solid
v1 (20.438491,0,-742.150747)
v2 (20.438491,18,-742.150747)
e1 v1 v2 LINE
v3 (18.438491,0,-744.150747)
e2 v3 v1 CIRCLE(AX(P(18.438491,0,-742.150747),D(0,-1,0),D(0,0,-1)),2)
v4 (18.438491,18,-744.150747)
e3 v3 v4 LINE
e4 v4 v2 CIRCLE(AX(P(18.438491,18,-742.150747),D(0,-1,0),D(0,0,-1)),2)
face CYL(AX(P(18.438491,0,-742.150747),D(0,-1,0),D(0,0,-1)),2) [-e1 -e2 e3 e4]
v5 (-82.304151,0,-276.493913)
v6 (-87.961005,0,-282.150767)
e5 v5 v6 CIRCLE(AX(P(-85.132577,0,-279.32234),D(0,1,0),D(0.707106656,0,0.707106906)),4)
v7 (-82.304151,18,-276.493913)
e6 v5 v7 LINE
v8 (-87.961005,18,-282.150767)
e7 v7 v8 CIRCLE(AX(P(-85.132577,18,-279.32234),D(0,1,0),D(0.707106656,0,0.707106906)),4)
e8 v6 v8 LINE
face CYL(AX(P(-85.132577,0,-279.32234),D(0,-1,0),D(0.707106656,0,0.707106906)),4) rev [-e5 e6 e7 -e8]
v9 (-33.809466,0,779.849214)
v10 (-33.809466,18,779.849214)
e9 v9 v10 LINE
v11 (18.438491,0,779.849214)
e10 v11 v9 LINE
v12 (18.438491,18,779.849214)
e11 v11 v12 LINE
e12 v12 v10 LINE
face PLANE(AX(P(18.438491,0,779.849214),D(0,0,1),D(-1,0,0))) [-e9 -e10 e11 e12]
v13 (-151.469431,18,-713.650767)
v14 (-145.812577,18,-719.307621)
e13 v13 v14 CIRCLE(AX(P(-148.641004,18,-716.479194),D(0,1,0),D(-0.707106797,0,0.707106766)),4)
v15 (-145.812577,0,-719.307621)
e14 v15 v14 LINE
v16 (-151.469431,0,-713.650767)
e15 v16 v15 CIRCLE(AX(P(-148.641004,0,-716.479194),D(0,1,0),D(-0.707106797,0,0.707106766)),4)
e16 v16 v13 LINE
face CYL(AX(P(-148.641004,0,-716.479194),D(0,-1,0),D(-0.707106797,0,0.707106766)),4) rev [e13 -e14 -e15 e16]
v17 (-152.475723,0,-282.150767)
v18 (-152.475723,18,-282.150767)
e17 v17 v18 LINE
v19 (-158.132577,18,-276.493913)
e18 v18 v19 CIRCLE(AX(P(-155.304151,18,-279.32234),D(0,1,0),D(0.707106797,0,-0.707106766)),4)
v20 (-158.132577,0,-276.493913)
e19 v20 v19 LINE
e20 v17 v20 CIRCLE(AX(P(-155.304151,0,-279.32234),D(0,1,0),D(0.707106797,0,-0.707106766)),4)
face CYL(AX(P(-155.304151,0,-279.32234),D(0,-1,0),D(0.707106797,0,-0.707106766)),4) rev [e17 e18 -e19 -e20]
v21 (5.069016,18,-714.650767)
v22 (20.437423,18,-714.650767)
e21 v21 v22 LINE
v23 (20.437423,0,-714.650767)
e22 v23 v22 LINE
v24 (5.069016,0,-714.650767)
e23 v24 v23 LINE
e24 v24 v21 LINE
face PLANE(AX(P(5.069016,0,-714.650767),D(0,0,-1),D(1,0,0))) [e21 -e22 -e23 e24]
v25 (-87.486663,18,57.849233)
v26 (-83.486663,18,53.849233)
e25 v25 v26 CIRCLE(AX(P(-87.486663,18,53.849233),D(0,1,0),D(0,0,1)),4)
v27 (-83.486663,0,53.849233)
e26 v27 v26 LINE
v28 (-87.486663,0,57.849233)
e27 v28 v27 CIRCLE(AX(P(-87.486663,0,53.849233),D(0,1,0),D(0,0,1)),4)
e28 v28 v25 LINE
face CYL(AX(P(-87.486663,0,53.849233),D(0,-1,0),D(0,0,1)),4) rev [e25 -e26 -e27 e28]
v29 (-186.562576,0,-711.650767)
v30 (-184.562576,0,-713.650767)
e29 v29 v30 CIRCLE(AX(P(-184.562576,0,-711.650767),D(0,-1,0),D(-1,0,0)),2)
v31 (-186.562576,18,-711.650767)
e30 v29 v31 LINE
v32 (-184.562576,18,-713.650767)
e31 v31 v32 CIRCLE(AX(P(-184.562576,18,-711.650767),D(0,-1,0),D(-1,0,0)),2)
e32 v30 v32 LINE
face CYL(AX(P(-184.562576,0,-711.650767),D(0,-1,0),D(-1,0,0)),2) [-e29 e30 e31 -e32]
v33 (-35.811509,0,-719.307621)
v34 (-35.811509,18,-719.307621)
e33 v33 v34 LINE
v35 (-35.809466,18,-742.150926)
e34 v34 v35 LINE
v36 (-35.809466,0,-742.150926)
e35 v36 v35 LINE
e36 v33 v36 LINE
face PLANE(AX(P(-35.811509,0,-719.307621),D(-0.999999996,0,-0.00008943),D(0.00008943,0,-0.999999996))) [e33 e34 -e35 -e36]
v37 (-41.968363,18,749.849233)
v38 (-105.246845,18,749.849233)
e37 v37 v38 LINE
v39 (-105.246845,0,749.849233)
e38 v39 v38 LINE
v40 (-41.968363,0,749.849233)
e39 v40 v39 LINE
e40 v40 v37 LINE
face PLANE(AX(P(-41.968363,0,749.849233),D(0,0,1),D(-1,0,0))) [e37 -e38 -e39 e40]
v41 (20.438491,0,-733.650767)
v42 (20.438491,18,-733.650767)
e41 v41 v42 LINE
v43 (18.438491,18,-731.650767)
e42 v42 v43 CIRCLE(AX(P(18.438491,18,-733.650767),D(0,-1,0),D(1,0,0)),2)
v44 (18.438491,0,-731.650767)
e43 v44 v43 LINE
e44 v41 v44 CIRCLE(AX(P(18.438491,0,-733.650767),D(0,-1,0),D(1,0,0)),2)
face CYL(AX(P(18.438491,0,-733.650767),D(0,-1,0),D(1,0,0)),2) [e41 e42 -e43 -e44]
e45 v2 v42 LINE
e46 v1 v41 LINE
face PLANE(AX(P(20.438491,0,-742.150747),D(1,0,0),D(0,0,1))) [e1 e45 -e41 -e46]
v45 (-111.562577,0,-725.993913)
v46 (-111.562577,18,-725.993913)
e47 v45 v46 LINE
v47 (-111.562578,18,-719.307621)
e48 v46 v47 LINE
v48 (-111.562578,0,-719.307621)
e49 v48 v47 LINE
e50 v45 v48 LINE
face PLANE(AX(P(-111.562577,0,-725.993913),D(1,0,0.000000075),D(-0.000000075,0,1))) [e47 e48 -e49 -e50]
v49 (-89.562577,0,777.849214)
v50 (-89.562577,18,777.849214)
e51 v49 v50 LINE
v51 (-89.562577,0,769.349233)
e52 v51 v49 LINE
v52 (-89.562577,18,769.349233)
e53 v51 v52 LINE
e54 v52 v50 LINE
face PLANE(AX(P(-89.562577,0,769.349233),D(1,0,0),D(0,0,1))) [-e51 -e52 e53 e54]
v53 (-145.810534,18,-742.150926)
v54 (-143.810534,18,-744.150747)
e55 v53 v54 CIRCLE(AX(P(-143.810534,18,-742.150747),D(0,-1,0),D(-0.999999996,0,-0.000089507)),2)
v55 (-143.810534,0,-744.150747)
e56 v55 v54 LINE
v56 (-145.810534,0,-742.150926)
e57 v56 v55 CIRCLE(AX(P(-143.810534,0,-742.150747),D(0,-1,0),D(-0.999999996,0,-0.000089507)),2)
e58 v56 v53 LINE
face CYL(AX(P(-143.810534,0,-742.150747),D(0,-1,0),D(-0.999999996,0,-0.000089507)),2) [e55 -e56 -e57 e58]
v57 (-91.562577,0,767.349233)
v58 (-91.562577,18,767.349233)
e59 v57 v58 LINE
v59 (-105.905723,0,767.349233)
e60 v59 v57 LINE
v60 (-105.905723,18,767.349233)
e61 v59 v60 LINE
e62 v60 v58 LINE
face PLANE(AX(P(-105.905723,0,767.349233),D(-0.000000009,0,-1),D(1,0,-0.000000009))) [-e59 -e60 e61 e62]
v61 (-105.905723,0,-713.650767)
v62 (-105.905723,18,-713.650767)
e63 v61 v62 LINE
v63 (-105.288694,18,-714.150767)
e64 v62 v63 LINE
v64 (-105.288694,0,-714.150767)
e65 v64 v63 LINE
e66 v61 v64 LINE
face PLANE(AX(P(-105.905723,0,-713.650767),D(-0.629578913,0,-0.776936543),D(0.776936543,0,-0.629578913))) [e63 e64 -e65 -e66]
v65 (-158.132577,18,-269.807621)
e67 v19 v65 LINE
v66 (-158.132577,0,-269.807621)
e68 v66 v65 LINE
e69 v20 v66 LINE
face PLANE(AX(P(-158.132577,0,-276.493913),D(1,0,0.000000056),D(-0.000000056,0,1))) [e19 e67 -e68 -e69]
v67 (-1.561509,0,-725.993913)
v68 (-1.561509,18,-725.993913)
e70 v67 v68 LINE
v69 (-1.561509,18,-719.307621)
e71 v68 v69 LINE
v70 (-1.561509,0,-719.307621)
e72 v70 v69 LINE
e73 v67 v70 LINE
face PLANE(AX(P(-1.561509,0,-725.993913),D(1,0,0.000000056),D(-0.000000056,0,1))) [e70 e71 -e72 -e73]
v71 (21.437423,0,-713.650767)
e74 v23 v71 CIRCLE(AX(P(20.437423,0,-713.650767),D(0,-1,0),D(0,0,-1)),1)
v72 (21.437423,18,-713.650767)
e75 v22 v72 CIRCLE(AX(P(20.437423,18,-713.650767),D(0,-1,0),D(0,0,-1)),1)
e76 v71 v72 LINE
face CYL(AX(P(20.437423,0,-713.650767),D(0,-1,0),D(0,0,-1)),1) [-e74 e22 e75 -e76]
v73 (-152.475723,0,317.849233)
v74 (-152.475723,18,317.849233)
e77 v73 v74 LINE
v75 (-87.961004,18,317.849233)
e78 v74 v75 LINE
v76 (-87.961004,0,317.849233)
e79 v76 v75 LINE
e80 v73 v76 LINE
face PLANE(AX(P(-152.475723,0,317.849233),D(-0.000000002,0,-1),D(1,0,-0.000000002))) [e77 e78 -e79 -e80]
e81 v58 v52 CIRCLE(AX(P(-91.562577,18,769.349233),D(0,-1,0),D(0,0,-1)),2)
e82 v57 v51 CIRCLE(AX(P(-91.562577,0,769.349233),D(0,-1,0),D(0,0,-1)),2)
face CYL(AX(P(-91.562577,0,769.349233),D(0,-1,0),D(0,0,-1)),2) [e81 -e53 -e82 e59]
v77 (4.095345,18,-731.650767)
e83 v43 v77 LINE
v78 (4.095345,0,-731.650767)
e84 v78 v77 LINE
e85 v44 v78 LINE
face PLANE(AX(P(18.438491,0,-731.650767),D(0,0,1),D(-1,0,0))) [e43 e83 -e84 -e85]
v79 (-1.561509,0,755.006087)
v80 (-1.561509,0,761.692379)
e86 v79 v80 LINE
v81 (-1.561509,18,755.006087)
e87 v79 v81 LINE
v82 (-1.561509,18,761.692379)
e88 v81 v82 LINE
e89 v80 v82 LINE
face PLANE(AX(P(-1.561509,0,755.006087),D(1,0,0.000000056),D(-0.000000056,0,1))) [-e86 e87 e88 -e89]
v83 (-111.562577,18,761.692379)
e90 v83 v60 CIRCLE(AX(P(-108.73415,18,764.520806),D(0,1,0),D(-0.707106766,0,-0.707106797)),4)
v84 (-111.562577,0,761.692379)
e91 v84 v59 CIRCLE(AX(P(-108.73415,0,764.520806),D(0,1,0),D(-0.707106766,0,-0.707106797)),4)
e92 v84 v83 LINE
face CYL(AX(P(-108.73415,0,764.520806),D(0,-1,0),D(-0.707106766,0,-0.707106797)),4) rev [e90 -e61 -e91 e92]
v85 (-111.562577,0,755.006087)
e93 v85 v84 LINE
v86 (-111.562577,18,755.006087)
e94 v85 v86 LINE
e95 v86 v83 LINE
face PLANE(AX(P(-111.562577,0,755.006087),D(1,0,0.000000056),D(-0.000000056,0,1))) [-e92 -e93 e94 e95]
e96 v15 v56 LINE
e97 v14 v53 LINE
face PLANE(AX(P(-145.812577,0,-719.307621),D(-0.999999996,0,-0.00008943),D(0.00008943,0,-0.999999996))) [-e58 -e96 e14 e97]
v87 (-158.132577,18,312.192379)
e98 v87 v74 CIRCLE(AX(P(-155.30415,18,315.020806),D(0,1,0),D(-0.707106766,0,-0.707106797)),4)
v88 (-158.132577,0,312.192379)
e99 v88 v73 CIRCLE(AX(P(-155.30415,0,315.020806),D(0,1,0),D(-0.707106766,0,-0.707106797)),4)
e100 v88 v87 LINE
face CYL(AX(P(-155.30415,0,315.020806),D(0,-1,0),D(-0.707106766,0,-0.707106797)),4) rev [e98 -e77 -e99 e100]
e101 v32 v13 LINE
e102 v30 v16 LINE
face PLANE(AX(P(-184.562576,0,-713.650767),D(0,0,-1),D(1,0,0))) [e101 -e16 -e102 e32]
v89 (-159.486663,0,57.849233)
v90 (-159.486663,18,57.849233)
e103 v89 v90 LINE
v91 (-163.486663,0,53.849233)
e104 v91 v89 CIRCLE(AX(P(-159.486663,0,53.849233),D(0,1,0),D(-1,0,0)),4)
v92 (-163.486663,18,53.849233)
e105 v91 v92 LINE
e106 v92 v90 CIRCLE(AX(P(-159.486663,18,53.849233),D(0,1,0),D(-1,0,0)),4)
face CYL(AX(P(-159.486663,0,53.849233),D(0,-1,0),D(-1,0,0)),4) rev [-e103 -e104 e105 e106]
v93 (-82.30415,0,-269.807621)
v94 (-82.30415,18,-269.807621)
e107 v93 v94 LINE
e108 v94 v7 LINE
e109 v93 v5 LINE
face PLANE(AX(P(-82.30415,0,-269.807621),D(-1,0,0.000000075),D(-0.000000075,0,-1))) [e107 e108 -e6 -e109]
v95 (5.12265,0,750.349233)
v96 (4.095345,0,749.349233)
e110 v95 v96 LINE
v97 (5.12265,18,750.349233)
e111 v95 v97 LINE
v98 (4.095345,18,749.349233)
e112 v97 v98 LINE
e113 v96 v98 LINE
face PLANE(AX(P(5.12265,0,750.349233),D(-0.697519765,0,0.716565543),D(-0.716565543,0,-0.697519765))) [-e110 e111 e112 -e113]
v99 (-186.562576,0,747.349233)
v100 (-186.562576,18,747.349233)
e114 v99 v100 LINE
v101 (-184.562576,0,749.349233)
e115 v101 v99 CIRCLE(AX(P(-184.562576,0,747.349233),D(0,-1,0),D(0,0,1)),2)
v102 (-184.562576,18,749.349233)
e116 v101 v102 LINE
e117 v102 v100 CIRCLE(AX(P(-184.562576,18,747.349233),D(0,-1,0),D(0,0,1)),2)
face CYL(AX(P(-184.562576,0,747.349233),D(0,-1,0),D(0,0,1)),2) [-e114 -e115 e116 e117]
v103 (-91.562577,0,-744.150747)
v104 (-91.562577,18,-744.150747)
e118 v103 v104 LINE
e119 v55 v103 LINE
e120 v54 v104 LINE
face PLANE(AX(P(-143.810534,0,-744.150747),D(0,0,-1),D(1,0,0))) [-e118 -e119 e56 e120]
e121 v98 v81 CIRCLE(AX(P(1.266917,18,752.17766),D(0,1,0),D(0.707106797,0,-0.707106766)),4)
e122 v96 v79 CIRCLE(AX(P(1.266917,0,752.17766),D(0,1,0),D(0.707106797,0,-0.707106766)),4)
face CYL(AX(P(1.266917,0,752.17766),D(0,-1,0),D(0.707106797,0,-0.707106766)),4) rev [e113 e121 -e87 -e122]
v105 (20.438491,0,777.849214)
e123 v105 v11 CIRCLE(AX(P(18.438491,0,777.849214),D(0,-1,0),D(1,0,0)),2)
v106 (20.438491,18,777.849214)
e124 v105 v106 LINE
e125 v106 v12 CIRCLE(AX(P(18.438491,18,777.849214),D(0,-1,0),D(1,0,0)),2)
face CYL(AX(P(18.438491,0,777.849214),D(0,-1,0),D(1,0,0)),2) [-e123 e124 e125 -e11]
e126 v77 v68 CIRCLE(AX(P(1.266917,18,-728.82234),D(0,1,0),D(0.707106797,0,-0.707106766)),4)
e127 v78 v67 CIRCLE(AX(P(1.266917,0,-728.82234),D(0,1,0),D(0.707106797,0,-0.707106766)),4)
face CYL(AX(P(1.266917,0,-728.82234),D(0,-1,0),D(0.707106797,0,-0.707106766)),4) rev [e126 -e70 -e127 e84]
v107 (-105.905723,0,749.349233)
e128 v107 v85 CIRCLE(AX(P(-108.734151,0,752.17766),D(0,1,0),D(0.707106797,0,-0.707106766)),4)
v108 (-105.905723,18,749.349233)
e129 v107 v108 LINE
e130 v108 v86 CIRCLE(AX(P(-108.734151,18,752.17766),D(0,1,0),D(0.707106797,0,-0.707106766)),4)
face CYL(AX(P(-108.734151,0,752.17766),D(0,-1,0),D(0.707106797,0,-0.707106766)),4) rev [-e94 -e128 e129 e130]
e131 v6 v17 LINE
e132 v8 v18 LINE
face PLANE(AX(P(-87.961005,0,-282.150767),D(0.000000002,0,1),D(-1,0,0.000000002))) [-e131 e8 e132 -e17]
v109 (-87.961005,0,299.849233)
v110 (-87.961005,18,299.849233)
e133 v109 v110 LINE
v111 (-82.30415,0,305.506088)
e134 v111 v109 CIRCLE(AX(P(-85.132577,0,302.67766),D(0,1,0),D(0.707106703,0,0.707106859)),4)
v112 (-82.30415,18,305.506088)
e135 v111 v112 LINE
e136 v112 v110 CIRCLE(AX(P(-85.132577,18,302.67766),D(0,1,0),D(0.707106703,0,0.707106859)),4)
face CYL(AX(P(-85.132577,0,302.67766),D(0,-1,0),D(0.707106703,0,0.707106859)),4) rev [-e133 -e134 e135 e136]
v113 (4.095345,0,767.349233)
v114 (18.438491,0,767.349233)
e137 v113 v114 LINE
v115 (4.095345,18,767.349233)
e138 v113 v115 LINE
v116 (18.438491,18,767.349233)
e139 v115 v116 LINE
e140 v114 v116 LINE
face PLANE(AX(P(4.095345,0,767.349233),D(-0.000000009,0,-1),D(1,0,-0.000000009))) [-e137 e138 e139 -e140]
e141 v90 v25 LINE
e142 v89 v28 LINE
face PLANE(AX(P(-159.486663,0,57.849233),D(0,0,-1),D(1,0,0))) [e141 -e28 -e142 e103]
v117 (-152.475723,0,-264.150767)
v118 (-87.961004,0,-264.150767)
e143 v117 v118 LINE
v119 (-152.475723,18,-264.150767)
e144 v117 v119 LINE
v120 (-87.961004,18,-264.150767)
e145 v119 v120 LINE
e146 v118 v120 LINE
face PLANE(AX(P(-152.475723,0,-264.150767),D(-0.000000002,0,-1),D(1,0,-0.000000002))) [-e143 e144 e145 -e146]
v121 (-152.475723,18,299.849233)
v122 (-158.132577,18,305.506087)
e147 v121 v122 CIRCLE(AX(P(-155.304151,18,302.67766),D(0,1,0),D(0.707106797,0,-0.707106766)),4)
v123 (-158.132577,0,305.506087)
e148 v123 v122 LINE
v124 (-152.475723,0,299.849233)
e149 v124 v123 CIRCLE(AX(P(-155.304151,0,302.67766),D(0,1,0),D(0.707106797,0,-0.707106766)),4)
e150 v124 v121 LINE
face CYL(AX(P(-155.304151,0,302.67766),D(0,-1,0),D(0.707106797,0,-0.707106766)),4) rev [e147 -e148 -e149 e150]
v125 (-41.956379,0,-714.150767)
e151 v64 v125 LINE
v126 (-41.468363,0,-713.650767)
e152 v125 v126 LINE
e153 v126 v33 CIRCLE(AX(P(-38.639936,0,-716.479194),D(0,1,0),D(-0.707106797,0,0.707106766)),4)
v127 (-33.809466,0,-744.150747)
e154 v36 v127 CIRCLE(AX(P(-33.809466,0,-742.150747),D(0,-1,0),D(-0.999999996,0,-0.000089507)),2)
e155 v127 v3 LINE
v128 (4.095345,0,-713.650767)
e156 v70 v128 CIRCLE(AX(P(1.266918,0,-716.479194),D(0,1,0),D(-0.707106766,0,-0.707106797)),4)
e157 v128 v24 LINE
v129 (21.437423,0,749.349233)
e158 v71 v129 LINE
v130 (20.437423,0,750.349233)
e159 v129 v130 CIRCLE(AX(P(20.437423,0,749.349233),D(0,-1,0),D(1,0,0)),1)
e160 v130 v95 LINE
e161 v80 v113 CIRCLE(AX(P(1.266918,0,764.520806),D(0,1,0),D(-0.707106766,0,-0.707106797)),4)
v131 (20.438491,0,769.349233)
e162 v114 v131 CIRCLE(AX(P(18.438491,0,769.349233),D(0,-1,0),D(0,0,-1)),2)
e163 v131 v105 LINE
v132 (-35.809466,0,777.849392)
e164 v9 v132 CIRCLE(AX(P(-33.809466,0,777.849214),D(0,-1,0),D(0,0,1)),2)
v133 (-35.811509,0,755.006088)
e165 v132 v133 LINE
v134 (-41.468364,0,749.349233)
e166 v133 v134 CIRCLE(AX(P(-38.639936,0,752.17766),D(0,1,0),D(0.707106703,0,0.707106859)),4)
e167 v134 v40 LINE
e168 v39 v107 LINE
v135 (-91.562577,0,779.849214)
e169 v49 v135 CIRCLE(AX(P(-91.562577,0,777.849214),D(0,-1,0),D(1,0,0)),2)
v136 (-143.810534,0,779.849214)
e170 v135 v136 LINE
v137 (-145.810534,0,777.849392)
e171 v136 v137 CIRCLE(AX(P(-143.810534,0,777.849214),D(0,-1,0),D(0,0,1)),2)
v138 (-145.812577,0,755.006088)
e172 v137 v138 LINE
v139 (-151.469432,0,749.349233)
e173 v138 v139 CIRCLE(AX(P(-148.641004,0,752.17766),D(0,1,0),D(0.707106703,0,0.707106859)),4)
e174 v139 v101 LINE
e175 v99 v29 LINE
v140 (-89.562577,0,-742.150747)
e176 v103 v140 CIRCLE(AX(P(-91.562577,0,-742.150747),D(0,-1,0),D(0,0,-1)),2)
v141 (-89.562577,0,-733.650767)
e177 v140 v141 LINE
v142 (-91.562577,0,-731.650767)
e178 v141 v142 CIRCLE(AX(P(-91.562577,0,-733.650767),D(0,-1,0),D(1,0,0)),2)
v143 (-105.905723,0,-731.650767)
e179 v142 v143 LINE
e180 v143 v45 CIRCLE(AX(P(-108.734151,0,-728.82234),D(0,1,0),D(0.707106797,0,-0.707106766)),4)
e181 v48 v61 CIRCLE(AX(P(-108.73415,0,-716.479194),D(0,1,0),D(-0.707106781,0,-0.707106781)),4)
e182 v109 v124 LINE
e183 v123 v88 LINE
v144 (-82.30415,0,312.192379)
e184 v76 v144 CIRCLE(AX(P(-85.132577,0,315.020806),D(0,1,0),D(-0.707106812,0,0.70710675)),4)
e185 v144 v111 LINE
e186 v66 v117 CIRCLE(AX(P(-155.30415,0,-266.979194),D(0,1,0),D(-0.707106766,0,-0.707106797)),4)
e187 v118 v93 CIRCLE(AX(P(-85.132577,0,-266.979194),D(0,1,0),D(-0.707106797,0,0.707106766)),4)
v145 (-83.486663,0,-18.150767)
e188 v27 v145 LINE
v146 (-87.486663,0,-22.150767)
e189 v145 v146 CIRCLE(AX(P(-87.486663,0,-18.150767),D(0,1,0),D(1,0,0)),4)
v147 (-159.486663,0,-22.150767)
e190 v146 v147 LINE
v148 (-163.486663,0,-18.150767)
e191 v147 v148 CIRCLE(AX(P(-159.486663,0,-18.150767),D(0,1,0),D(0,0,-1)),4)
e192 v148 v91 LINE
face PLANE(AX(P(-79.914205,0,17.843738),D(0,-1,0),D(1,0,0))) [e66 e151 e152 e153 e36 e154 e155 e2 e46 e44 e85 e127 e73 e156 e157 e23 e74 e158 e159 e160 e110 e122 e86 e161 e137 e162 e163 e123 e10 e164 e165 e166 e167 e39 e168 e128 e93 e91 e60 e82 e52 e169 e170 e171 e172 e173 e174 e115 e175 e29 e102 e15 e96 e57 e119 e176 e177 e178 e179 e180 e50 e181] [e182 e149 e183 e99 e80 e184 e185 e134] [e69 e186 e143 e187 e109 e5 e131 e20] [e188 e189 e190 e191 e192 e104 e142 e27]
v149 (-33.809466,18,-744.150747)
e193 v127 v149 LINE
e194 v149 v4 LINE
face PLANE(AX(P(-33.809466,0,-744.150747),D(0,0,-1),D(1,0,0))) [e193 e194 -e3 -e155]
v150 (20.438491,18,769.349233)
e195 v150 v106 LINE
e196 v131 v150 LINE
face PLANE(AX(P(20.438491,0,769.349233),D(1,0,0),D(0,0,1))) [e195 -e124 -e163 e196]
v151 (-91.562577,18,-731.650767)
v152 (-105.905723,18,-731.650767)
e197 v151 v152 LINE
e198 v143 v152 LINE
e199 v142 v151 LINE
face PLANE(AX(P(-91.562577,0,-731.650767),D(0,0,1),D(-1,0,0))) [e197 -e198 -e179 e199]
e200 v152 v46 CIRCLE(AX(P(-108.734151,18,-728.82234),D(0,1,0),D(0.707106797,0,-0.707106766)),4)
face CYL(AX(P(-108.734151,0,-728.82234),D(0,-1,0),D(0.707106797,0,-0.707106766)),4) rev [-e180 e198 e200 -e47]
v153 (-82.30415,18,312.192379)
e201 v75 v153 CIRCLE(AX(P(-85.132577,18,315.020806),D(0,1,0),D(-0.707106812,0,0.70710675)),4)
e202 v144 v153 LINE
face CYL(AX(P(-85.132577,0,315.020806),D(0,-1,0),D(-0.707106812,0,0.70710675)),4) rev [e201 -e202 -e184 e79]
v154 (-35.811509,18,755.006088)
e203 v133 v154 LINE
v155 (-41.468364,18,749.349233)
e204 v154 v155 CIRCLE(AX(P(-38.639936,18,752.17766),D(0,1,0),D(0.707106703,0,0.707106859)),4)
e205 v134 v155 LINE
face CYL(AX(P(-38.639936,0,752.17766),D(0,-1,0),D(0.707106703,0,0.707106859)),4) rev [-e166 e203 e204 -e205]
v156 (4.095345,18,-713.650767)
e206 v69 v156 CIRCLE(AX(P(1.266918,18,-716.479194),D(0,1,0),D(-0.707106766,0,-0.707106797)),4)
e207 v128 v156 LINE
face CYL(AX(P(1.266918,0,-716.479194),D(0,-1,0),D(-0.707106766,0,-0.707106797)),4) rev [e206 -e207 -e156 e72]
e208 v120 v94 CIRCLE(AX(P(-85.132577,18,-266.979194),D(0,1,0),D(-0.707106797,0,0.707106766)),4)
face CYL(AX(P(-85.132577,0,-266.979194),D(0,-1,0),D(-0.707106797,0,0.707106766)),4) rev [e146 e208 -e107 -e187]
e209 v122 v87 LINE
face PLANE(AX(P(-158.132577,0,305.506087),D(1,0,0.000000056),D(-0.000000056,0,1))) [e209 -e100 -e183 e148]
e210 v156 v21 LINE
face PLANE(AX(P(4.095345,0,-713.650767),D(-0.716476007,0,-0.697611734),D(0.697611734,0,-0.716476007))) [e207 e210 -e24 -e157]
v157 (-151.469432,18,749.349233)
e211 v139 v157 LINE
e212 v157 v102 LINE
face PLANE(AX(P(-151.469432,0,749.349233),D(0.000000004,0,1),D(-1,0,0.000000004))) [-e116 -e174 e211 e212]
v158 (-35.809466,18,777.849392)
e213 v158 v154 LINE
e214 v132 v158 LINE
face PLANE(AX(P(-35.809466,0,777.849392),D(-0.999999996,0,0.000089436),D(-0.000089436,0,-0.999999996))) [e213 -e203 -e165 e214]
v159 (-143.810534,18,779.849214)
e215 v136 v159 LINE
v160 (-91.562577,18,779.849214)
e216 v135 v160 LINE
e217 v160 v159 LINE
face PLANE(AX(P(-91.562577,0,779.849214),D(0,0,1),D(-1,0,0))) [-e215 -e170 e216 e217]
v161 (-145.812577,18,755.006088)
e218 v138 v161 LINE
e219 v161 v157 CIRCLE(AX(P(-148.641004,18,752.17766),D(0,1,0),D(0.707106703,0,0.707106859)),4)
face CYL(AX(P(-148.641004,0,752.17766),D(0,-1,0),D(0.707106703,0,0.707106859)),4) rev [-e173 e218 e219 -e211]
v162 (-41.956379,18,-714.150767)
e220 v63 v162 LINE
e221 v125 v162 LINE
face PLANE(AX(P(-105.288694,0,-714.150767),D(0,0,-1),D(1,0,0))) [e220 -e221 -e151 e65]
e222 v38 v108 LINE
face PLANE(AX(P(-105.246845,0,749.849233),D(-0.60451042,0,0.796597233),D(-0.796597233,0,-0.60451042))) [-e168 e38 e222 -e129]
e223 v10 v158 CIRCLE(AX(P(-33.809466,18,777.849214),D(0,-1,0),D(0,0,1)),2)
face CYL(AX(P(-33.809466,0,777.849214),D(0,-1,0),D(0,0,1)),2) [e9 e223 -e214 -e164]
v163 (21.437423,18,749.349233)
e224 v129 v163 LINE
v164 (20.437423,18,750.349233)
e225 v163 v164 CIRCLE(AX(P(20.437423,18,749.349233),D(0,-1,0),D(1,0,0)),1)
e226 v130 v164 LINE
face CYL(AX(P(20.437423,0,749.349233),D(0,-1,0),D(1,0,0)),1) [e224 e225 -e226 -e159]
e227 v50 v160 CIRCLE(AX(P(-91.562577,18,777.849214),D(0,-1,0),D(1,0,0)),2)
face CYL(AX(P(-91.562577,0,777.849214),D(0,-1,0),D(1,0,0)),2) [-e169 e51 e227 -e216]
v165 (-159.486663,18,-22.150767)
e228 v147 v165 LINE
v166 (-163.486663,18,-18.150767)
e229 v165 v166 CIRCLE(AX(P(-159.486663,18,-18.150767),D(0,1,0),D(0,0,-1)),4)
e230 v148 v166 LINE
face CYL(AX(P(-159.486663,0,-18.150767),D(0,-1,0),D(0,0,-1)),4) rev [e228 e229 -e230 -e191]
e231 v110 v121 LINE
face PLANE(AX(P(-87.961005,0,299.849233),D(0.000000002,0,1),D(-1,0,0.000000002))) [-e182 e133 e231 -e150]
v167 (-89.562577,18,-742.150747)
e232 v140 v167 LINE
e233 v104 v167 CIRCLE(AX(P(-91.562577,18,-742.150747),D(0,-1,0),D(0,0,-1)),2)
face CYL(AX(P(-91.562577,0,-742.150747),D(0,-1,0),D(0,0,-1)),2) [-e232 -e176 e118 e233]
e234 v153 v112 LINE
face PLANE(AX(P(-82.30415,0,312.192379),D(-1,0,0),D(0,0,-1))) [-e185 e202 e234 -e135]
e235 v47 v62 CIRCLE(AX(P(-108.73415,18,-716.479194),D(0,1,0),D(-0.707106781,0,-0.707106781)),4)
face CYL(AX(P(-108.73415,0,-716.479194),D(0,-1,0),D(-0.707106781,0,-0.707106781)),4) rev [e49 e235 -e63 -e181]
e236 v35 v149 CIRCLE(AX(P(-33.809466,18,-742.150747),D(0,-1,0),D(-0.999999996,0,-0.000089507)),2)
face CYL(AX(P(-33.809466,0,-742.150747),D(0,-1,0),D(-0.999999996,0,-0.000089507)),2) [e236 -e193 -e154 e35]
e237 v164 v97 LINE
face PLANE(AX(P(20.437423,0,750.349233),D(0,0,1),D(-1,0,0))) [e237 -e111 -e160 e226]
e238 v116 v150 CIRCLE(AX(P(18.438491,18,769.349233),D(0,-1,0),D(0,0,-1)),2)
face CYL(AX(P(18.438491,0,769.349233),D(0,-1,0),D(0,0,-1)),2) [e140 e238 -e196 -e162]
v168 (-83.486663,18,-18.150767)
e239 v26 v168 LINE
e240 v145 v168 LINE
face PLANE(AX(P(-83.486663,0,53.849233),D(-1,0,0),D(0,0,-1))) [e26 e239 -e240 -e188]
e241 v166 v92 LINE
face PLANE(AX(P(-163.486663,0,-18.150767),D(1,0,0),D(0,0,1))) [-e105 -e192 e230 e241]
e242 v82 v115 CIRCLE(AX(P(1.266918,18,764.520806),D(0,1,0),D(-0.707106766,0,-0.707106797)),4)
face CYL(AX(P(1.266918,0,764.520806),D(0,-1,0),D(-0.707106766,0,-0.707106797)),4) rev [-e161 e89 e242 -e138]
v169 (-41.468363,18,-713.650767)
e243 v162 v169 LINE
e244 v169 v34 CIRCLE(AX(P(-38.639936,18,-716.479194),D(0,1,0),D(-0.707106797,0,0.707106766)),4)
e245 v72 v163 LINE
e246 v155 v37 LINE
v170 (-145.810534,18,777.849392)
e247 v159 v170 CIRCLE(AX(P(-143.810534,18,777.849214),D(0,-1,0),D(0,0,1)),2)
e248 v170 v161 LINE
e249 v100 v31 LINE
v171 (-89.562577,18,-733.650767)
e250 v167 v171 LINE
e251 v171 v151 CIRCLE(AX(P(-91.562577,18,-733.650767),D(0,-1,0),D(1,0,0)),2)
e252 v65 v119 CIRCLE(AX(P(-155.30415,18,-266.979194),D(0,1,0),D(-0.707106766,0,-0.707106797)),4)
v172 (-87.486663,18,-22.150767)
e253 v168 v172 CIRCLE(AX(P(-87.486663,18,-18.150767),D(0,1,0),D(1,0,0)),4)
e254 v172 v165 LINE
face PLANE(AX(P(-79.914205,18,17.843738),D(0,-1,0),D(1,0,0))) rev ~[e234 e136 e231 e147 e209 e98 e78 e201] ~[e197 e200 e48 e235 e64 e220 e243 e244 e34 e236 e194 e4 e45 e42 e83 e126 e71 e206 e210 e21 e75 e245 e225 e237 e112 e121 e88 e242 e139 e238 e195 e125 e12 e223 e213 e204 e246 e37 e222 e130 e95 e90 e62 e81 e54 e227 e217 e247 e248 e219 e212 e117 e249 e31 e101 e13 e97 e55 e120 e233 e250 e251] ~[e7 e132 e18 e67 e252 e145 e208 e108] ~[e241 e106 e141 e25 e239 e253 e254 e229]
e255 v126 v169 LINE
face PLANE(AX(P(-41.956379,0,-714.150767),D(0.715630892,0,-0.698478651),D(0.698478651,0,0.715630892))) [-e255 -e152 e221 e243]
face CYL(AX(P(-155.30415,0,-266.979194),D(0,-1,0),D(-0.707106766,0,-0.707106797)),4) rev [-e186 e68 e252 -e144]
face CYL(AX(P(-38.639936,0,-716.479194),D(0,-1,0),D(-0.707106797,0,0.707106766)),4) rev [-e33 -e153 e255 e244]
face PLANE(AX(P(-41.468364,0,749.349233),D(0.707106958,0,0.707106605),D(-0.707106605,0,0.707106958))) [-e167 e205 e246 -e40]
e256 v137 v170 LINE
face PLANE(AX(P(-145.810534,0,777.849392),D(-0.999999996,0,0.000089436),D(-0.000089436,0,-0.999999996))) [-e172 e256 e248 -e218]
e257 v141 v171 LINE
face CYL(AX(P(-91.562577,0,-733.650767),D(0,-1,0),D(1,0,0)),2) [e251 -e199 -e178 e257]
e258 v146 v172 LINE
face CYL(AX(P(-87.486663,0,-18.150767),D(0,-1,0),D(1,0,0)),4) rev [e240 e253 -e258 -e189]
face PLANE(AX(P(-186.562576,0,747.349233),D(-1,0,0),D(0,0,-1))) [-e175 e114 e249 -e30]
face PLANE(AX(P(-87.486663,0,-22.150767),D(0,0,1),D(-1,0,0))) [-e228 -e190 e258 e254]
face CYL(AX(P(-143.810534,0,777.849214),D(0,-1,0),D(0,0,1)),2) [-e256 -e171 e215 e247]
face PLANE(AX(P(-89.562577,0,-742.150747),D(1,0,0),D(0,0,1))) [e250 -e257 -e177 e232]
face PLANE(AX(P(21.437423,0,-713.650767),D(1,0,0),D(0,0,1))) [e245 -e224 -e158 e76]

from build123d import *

# Parameters (mm, degrees)
F1_DEPTH = 18


# Not quite as in the source:
# - ends of sketch curves that miss each other by under 0.0002 mm in the source are joined


with BuildPart() as f1:
    # F0 (on Front) → F1 (new body)
    with BuildSketch(Plane.XZ):
        with BuildLine():
            ThreePointArc((-111.5625776076, -719.3076212806), (-111.5625776076, -713.6507670312), (-105.9057233581, -713.6507670312))
            Line((-105.9057233581, -713.6507670312), (-105.2886944829, -714.1507671559))
            Line((-105.2886944829, -714.1507671559), (-41.9563794829, -714.1507671559))
            Line((-41.9563794829, -714.1507671559), (-41.4683634829, -713.6507671559))
            ThreePointArc((-41.4683634829, -713.6507671559), (-35.8115093581, -713.6507670312), (-35.8115093581, -719.3076212806))
            Line((-35.8115093581, -719.3076212806), (-35.8094664829, -742.1509261559))
            ThreePointArc((-35.8094664829, -742.1509261559), (-35.2236167578, -743.5650240029), (-33.8094664829, -744.1507471559))
            Line((-33.8094664829, -744.1507471559), (18.4384905171, -744.1507471559))
            ThreePointArc((18.4384905171, -744.1507471559), (19.8527040795, -743.5649607183), (20.4384905171, -742.1507471559))
            Line((20.4384905171, -742.1507471559), (20.4384905171, -733.6507671559))
            ThreePointArc((20.4384905171, -733.6507671559), (19.8527040795, -732.2365535935), (18.4384905171, -731.6507671559))
            Line((18.4384905171, -731.6507671559), (4.0953445171, -731.6507671559))
            ThreePointArc((4.0953445171, -731.6507671559), (-1.5615098576, -731.6507670306), (-1.5615091076, -725.9939125312))
            Line((-1.5615091076, -725.9939125312), (-1.5615094829, -719.3076211559))
            ThreePointArc((-1.5615094829, -719.3076211559), (-1.5615096076, -713.6507670312), (4.0953446419, -713.6507670312))
            Line((4.0953446419, -713.6507670312), (5.0690155171, -714.6507671559))
            Line((5.0690155171, -714.6507671559), (20.4374225171, -714.6507671559))
            ThreePointArc((20.4374225171, -714.6507671559), (21.1445292983, -714.3578739371), (21.4374225171, -713.6507671559))
            Line((21.4374225171, -713.6507671559), (21.4374225171, 749.3492328441))
            ThreePointArc((21.4374225171, 749.3492328441), (21.1445292983, 750.0563396253), (20.4374225171, 750.3492328441))
            Line((20.4374225171, 750.3492328441), (5.1226495171, 750.3492328441))
            Line((5.1226495171, 750.3492328441), (4.0953445171, 749.3492328441))
            ThreePointArc((4.0953445171, 749.3492328441), (-1.5615098576, 749.3492329694), (-1.5615091076, 755.0060874688))
            Line((-1.5615091076, 755.0060874688), (-1.5615094829, 761.6923788441))
            ThreePointArc((-1.5615094829, 761.6923788441), (-1.5615096076, 767.3492329688), (4.0953446419, 767.3492329688))
            Line((4.0953446419, 767.3492329688), (18.4384905171, 767.3492328441))
            ThreePointArc((18.4384905171, 767.3492328441), (19.8527040795, 767.9350192817), (20.4384905171, 769.3492328441))
            Line((20.4384905171, 769.3492328441), (20.4384905171, 777.8492138441))
            ThreePointArc((20.4384905171, 777.8492138441), (19.8527040795, 779.2634274065), (18.4384905171, 779.8492138441))
            Line((18.4384905171, 779.8492138441), (-33.8094664829, 779.8492138441))
            ThreePointArc((-33.8094664829, 779.8492138441), (-35.2236171114, 779.2634903376), (-35.809466475, 777.8493918441))
            Line((-35.809466475, 777.8493918441), (-35.8115094829, 755.0060878441))
            ThreePointArc((-35.8115094829, 755.0060878441), (-35.8115091081, 749.3492329694), (-41.4683636076, 749.3492327194))
            Line((-41.4683636076, 749.3492327194), (-41.9683634829, 749.8492328441))
            Line((-41.9683634829, 749.8492328441), (-105.2468454829, 749.8492328441))
            Line((-105.2468454829, 749.8492328441), (-105.9057234829, 749.3492328441))
            ThreePointArc((-105.9057234829, 749.3492328441), (-111.5625778576, 749.3492329694), (-111.5625771076, 755.0060874688))
            Line((-111.5625771076, 755.0060874688), (-111.5625774829, 761.6923788441))
            ThreePointArc((-111.5625774829, 761.6923788441), (-111.5625776076, 767.3492329688), (-105.9057233581, 767.3492329688))
            Line((-105.9057233581, 767.3492329688), (-91.5625774829, 767.3492328441))
            ThreePointArc((-91.5625774829, 767.3492328441), (-90.1483639205, 767.9350192817), (-89.5625774829, 769.3492328441))
            Line((-89.5625774829, 769.3492328441), (-89.5625774829, 777.8492138441))
            ThreePointArc((-89.5625774829, 777.8492138441), (-90.1483639205, 779.2634274065), (-91.5625774829, 779.8492138441))
            Line((-91.5625774829, 779.8492138441), (-143.8105344829, 779.8492138441))
            ThreePointArc((-143.8105344829, 779.8492138441), (-145.2246851114, 779.2634903376), (-145.810534475, 777.8493918441))
            Line((-145.810534475, 777.8493918441), (-145.8125774829, 755.0060878441))
            ThreePointArc((-145.8125774829, 755.0060878441), (-145.8125771081, 749.3492329694), (-151.4694316076, 749.3492327194))
            Line((-151.4694316076, 749.3492327194), (-184.5625764829, 749.3492328441))
            ThreePointArc((-184.5625764829, 749.3492328441), (-185.9767900453, 748.7634464065), (-186.5625764829, 747.3492328441))
            Line((-186.5625764829, 747.3492328441), (-186.5625764829, -711.6507671559))
            ThreePointArc((-186.5625764829, -711.6507671559), (-185.9767900453, -713.0649807183), (-184.5625764829, -713.6507671559))
            Line((-184.5625764829, -713.6507671559), (-151.4694314829, -713.6507671559))
            ThreePointArc((-151.4694314829, -713.6507671559), (-145.8125773581, -713.6507670312), (-145.8125773581, -719.3076212806))
            Line((-145.8125773581, -719.3076212806), (-145.8105344829, -742.1509261559))
            ThreePointArc((-145.8105344829, -742.1509261559), (-145.2246847578, -743.5650240029), (-143.8105344829, -744.1507471559))
            Line((-143.8105344829, -744.1507471559), (-91.5625774829, -744.1507471559))
            ThreePointArc((-91.5625774829, -744.1507471559), (-90.1483639205, -743.5649607183), (-89.5625774829, -742.1507471559))
            Line((-89.5625774829, -742.1507471559), (-89.5625774829, -733.6507671559))
            ThreePointArc((-89.5625774829, -733.6507671559), (-90.1483639205, -732.2365535935), (-91.5625774829, -731.6507671559))
            Line((-91.5625774829, -731.6507671559), (-105.9057234829, -731.6507671559))
            ThreePointArc((-105.9057234829, -731.6507671559), (-111.5625778576, -731.6507670306), (-111.5625771076, -725.9939125312))
            Line((-111.5625771076, -725.9939125312), (-111.5625776076, -719.3076212806))
        make_face()
        with BuildLine():
            ThreePointArc((-82.3041508581, -276.4939125312), (-82.3041501081, -282.1507670306), (-87.9610046076, -282.1507672806))
            Line((-87.9610046076, -282.1507672806), (-152.4757234829, -282.1507671559))
            ThreePointArc((-152.4757234829, -282.1507671559), (-158.1325778576, -282.1507670306), (-158.1325771076, -276.4939125312))
            Line((-158.1325771076, -276.4939125312), (-158.1325774829, -269.8076211559))
            ThreePointArc((-158.1325774829, -269.8076211559), (-158.1325776076, -264.1507670312), (-152.4757233581, -264.1507670312))
            Line((-152.4757233581, -264.1507670312), (-87.9610044829, -264.1507671559))
            ThreePointArc((-87.9610044829, -264.1507671559), (-82.3041503581, -264.1507670312), (-82.3041503581, -269.8076212806))
            Line((-82.3041503581, -269.8076212806), (-82.3041508581, -276.4939125312))
        make_face(mode=Mode.SUBTRACT)
        with BuildLine():
            Line((-163.4866634829, -18.1507671559), (-163.4866634829, 53.8492328441))
            ThreePointArc((-163.4866634829, 53.8492328441), (-162.3150906076, 56.6776599688), (-159.4866634829, 57.8492328441))
            Line((-159.4866634829, 57.8492328441), (-87.4866634829, 57.8492328441))
            ThreePointArc((-87.4866634829, 57.8492328441), (-84.6582363581, 56.6776599688), (-83.4866634829, 53.8492328441))
            Line((-83.4866634829, 53.8492328441), (-83.4866634829, -18.1507671559))
            ThreePointArc((-83.4866634829, -18.1507671559), (-84.6582363581, -20.9791942806), (-87.4866634829, -22.1507671559))
            Line((-87.4866634829, -22.1507671559), (-159.4866634829, -22.1507671559))
            ThreePointArc((-159.4866634829, -22.1507671559), (-162.3150906076, -20.9791942806), (-163.4866634829, -18.1507671559))
        make_face(mode=Mode.SUBTRACT)
        with BuildLine():
            Line((-82.3041504829, 312.1923788441), (-82.3041504829, 305.5060878441))
            ThreePointArc((-82.3041504829, 305.5060878441), (-82.3041503581, 299.8492327194), (-87.9610046076, 299.8492327194))
            Line((-87.9610046076, 299.8492327194), (-152.4757234829, 299.8492328441))
            ThreePointArc((-152.4757234829, 299.8492328441), (-158.1325778576, 299.8492329694), (-158.1325771076, 305.5060874688))
            Line((-158.1325771076, 305.5060874688), (-158.1325774829, 312.1923788441))
            ThreePointArc((-158.1325774829, 312.1923788441), (-158.1325776076, 317.8492329688), (-152.4757233581, 317.8492329688))
            Line((-152.4757233581, 317.8492329688), (-87.9610044829, 317.8492328441))
            ThreePointArc((-87.9610044829, 317.8492328441), (-82.3041503581, 317.8492329688), (-82.3041504829, 312.1923788441))
        make_face(mode=Mode.SUBTRACT)
    extrude(amount=-F1_DEPTH)


solid = f1.part
